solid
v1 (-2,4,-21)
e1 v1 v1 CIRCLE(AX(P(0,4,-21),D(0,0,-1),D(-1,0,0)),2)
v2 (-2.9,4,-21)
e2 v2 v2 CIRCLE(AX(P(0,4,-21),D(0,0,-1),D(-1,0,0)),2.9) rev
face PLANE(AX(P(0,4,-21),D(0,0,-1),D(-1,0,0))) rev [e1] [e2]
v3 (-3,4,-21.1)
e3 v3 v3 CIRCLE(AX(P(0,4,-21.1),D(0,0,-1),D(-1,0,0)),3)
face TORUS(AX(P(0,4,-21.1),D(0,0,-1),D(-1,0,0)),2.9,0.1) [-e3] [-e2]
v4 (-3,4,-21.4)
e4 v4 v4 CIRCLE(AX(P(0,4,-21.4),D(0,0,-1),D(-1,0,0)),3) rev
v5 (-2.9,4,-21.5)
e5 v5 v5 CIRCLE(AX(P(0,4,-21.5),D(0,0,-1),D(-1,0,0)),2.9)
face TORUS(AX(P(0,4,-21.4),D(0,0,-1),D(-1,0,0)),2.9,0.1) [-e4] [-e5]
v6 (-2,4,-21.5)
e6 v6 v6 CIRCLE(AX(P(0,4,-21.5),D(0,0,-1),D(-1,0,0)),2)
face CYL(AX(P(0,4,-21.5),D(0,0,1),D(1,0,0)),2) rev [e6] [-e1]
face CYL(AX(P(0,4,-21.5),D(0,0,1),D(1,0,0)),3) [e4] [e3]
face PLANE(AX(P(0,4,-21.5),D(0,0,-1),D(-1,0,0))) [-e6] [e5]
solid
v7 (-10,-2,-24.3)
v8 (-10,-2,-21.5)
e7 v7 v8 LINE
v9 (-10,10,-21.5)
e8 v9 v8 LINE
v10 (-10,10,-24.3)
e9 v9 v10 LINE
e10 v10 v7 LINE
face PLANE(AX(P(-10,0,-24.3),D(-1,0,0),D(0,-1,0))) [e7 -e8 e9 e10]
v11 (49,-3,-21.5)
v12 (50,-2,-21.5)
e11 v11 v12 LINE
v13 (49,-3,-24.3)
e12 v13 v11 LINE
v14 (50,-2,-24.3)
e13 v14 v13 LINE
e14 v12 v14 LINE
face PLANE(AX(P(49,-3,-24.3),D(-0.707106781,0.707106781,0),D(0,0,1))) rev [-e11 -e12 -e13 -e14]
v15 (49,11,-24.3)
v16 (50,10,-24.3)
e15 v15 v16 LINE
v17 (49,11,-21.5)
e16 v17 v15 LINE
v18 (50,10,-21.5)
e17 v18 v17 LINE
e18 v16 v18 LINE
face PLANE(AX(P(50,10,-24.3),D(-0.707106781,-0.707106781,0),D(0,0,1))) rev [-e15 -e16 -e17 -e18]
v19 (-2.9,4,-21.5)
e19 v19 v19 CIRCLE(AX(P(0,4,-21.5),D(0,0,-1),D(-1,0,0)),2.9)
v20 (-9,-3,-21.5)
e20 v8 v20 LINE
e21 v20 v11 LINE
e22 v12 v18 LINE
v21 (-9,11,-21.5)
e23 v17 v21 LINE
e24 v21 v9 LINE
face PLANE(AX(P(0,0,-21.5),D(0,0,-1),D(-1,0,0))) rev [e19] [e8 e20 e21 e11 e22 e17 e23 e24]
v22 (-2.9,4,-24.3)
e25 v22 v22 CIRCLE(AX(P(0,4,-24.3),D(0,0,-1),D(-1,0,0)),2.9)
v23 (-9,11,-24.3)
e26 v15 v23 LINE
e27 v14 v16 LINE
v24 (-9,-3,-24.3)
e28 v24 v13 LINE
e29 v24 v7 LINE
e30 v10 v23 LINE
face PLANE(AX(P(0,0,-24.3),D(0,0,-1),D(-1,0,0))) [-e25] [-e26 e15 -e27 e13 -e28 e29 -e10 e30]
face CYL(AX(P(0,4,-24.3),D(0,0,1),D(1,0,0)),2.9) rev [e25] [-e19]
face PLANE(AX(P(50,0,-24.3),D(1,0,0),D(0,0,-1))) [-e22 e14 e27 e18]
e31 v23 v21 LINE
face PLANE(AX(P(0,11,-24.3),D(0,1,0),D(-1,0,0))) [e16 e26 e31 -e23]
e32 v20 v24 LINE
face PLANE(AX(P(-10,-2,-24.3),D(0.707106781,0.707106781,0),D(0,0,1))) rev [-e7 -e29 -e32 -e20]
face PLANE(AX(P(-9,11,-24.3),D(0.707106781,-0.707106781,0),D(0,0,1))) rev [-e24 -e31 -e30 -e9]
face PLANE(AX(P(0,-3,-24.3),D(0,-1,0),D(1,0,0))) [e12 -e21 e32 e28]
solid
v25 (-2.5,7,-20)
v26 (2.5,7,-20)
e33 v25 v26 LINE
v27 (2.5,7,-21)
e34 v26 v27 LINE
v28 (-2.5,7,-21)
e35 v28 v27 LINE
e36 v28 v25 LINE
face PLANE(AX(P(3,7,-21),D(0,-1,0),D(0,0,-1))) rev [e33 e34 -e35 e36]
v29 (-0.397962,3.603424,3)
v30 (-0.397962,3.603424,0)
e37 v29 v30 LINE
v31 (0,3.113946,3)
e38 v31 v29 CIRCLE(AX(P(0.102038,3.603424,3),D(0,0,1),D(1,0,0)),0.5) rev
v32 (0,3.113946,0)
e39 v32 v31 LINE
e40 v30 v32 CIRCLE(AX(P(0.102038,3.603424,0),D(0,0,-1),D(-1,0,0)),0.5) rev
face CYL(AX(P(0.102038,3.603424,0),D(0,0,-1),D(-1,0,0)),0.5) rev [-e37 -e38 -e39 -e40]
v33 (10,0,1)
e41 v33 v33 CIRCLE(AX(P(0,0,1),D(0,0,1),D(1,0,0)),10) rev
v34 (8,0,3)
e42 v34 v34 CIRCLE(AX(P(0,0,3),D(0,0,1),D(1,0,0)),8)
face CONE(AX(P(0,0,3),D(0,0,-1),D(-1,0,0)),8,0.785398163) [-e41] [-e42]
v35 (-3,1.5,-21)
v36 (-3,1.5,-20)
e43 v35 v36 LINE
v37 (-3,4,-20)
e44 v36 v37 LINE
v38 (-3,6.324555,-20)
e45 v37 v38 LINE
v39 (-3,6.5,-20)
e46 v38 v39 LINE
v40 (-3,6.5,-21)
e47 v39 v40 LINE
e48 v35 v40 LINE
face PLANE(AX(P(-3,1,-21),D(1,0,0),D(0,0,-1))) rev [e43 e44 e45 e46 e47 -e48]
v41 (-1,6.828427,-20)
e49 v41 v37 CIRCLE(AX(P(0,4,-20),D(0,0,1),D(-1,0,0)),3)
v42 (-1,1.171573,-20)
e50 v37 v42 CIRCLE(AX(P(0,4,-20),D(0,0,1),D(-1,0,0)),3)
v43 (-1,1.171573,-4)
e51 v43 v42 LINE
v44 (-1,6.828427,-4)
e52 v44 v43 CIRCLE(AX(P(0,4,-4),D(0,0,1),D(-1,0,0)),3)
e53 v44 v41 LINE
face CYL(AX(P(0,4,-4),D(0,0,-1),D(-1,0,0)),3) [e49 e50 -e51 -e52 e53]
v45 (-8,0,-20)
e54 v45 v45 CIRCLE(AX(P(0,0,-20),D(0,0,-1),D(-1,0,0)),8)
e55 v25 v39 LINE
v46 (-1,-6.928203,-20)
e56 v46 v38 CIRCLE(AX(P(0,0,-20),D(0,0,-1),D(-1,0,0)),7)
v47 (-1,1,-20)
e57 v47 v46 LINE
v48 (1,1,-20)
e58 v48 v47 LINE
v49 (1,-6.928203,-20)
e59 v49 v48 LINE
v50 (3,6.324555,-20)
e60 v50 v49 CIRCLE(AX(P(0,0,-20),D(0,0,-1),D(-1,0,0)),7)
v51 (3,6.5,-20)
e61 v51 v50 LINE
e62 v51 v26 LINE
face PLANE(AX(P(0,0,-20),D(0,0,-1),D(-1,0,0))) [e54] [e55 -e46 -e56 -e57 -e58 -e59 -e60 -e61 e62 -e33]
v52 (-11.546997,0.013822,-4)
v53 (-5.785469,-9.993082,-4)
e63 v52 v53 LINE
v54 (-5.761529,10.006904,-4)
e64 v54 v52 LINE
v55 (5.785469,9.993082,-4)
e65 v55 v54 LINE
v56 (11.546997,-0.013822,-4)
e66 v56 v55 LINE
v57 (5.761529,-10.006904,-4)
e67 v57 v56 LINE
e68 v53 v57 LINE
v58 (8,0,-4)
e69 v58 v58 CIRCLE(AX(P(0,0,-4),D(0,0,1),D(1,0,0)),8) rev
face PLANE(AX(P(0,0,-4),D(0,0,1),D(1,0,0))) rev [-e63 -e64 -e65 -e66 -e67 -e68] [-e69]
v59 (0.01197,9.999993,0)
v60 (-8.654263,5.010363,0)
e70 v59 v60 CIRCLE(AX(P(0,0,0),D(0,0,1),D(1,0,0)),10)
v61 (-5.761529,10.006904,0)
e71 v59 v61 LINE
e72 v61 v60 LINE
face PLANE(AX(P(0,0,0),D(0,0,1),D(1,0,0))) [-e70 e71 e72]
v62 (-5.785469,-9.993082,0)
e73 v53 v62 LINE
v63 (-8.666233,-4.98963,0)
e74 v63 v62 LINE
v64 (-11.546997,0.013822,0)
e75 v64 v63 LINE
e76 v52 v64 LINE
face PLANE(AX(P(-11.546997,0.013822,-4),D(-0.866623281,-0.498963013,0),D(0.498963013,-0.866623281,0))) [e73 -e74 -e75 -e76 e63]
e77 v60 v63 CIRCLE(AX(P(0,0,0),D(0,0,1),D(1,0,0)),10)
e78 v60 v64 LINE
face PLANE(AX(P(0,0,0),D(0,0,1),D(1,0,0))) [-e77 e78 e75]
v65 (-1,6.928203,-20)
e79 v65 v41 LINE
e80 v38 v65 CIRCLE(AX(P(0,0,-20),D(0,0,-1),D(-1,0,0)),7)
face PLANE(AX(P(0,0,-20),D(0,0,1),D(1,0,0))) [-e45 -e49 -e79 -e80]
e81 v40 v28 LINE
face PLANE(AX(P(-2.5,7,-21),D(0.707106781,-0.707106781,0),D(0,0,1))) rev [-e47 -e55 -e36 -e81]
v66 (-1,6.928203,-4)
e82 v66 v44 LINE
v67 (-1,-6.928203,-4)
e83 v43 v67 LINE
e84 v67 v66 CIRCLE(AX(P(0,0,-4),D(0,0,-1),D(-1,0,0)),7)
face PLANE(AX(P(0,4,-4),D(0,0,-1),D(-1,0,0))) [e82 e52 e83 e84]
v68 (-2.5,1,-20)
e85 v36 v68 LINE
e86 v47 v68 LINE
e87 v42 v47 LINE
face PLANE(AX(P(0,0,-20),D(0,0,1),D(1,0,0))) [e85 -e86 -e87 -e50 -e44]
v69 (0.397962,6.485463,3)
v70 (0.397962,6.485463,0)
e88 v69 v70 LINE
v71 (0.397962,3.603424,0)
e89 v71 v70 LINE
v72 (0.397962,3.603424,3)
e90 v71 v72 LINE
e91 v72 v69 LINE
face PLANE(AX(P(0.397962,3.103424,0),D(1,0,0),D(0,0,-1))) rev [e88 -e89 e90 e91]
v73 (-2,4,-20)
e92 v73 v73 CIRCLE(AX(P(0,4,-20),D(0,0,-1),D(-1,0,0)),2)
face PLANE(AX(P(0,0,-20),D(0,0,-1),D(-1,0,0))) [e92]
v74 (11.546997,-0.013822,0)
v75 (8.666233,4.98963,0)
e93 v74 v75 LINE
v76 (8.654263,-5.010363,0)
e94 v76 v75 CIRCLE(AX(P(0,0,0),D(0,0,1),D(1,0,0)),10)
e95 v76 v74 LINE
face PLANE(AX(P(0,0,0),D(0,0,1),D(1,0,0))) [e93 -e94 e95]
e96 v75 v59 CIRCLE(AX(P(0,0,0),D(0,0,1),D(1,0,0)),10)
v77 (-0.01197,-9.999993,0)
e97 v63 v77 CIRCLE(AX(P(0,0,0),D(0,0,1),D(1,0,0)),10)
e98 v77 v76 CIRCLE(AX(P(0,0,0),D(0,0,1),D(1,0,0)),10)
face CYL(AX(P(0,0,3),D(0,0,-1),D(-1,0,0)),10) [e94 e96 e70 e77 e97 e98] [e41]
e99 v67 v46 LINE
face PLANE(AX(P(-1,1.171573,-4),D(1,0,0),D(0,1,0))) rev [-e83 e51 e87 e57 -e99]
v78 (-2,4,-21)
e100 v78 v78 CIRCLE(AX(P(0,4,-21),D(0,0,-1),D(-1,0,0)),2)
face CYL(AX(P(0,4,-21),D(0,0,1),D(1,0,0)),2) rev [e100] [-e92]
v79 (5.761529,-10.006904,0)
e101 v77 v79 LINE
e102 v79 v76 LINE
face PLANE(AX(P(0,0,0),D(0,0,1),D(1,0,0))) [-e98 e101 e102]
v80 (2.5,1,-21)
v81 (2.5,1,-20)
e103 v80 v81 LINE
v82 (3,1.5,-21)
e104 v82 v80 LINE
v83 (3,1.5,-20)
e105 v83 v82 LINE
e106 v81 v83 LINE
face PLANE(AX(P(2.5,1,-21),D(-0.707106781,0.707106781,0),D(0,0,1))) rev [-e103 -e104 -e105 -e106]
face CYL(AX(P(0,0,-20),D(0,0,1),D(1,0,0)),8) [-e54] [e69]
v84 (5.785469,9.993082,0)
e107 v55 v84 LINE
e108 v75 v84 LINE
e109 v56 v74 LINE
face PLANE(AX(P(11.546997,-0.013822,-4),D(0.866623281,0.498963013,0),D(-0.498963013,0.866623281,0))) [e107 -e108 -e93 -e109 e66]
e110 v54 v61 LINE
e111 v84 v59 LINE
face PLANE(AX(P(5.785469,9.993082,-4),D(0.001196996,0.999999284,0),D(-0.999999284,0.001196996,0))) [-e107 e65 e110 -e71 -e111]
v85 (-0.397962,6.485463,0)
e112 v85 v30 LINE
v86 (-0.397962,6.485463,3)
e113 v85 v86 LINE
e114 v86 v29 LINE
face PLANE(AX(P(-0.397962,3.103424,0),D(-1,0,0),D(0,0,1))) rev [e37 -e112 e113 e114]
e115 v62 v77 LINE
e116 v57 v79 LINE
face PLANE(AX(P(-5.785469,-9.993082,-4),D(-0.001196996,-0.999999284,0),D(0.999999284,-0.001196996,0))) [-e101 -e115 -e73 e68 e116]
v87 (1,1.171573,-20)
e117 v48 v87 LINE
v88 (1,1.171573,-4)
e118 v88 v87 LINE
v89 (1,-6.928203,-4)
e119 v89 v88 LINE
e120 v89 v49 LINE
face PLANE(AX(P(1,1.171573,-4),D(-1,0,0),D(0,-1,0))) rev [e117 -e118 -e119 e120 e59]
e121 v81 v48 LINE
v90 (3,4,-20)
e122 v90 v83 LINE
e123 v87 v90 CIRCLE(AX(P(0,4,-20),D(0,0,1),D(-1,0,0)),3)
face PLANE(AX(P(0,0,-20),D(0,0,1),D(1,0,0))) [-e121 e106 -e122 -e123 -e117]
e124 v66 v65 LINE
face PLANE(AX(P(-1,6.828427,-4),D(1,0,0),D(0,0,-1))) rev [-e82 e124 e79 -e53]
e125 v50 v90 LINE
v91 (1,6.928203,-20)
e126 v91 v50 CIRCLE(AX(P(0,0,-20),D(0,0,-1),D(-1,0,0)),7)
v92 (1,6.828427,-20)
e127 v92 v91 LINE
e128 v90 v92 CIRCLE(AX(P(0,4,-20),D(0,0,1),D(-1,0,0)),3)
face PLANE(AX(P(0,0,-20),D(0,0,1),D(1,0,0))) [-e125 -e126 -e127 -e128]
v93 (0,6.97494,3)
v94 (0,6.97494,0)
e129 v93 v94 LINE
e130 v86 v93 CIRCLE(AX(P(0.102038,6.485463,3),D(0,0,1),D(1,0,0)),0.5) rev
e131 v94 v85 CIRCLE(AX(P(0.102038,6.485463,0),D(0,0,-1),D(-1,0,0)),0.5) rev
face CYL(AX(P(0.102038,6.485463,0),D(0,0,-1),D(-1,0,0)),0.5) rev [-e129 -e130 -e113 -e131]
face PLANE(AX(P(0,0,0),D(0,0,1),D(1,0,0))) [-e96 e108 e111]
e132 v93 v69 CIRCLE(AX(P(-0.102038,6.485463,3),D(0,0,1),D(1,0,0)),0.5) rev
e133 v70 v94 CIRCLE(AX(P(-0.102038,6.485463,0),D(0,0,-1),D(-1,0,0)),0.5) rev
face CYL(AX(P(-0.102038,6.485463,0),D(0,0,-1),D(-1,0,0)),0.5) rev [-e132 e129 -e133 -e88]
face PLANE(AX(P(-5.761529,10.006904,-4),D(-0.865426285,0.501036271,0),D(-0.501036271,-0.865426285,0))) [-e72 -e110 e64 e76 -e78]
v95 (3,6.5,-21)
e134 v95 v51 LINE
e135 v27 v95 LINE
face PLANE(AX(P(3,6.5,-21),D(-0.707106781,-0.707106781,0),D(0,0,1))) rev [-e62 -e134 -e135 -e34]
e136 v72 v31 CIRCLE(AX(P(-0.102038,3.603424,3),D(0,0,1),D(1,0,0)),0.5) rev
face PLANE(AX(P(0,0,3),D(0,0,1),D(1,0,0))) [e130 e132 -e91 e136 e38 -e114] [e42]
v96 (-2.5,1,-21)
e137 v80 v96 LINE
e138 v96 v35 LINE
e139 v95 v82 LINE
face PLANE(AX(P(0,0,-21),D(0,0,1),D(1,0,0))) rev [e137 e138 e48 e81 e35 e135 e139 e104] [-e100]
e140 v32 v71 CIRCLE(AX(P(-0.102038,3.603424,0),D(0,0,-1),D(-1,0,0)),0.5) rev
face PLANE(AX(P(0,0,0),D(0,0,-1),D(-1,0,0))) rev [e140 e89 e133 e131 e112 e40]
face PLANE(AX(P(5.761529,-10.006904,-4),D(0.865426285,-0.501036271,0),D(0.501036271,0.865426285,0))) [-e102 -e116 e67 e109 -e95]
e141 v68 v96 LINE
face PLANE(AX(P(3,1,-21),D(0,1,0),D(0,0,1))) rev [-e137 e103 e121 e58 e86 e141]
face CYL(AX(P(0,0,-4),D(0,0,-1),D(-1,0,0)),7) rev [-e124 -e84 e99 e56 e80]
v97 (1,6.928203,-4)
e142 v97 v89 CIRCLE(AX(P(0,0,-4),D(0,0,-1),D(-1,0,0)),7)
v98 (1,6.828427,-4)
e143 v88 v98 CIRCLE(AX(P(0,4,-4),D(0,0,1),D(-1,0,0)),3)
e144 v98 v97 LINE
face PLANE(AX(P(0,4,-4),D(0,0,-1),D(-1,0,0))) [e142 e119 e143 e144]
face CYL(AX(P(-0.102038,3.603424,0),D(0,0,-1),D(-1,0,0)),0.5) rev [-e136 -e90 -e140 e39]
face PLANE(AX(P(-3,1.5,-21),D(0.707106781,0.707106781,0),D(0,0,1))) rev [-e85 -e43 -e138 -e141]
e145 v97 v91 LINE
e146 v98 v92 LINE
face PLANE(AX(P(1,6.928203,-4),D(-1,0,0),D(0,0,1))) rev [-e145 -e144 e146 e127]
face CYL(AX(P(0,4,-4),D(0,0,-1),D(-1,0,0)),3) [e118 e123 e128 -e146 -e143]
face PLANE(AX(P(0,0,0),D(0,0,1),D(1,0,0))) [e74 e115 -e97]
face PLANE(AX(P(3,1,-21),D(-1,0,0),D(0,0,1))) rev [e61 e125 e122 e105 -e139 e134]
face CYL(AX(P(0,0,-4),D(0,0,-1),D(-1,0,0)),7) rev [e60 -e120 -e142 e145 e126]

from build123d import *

# Parameters (mm, degrees)
BOSS_EXTRUDE1_DEPTH     = 4
SKETCH2_R               = 8
BOSS_EXTRUDE2_DEPTH     = 16
CUT_EXTRUDE1_DEPTH      = 16
SKETCH5_R               = 10
BOSS_EXTRUDE4_DEPTH     = 3
CHAMFER2_SIZE           = 2
SKETCH6_W               = 0.795923982
SKETCH6_H               = 3.882038779
CUT_EXTRUDE2_DEPTH      = 3
FILLET2_R               = 0.5
SKETCH9_W               = 6
SKETCH9_H               = 6
SKETCH9_R               = 2
BOSS_EXTRUDE6_DEPTH     = 1
CHAMFER3_SIZE           = 0.5
SKETCH10_R              = 3
SKETCH10_R_2            = 2
BOSS_EXTRUDE7_DEPTH     = 0.5
FILLET3_R               = 0.1
BOSS_EXTRUDE8_OUTLINE_W = 60
BOSS_EXTRUDE8_OUTLINE_H = 14
BOSS_EXTRUDE8_OUTLINE_R = 2.9
BOSS_EXTRUDE8_DEPTH     = 2.8
CHAMFER4_SIZE           = 1


# Read off the part's stored shape, not the designer's step: Boss-Extrude8
with BuildPart() as part:
    # Sketch1 → Boss-Extrude1 (new body)
    with BuildSketch(Plane.XY):
        Polygon((5.785468513, 9.993081978), (-5.761528598, 10.006903694), (-11.546997112, 0.013821717), (-5.785468513, -9.993081978), (5.761528598, -10.006903694), (11.546997112, -0.013821717), align=None)
    extrude(amount=-BOSS_EXTRUDE1_DEPTH)

    # Sketch2 → Boss-Extrude2 (add)
    with BuildSketch(Plane(origin=(0, 0, -4), x_dir=(-1, 0, 0), z_dir=(0, 0, -1))):
        with Locations(Location((0, 0, 0), (0, 0, 180))):
            Circle(SKETCH2_R)
    extrude(amount=BOSS_EXTRUDE2_DEPTH)

    # Sketch3 → Cut-Extrude1 (cut)
    with BuildSketch(Plane(origin=(0, 0, -20), x_dir=(-1, 0, 0), z_dir=(0, 0, -1))):
        with BuildLine():
            Line((-1, 1.171572875), (-1, -6.92820323))
            ThreePointArc((-1, -6.92820323), (-7, 0), (-1, 6.92820323))
            Line((-1, 6.92820323), (-1, 6.828427125))
            ThreePointArc((-1, 6.828427125), (-3, 4), (-1, 1.171572875))
        make_face()
        with BuildLine():
            Line((1, 1.171572875), (1, -6.92820323))
            ThreePointArc((1, -6.92820323), (7, 0), (1, 6.92820323))
            Line((1, 6.92820323), (1, 6.828427125))
            ThreePointArc((1, 6.828427125), (3, 4), (1, 1.171572875))
        make_face()
    extrude(amount=-CUT_EXTRUDE1_DEPTH, mode=Mode.SUBTRACT)

    # Sketch5 → Boss-Extrude4 (add)
    with BuildSketch(Plane.XY):
        with Locations(Location((0, 0, 0), (0, 0, 209.931417178))):
            Circle(SKETCH5_R)
    extrude(amount=BOSS_EXTRUDE4_DEPTH)

    # Chamfer2
    chamfer2_edges = [part.edges().sort_by_distance(p)[0] for p in [
        (8.666232812, 4.989630131, 3),
    ]]
    chamfer(chamfer2_edges, length=CHAMFER2_SIZE)

    # Sketch6 → Cut-Extrude2 (cut)
    with BuildSketch(Plane.XY.offset(3)):
        with Locations((0, 5.044443369)):
            Rectangle(SKETCH6_W, SKETCH6_H)
    extrude(amount=-CUT_EXTRUDE2_DEPTH, mode=Mode.SUBTRACT)

    # Fillet2
    # the kernel refuses this fillet: 0.5 mm, written as the material it adds along each edge
    with BuildSketch(Plane(origin=(0.397961991, 3.103423979, 3), x_dir=(-1, 0, 0), z_dir=(0, 0, -1)), Plane(origin=(0.397961991, 6.985462758, 3), x_dir=(0, -1, 0), z_dir=(0, 0, -1)), Plane(origin=(-0.397961991, 6.985462758, 3), x_dir=(1, 0, 0), z_dir=(0, 0, -1))) as fillet2_piece_1:
        with BuildLine():
            CenterArc((FILLET2_R, FILLET2_R), FILLET2_R, 180, 90)
            Line((0, FILLET2_R), (0, 0))
            Line((0, 0), (FILLET2_R, 0))
        make_face()
    extrude(amount=4.25)
    with BuildSketch(Plane(origin=(-0.397961991, 3.103423979, 3), x_dir=(1, 0, 0), z_dir=(0, 0, -1))) as fillet2_piece_2:
        with BuildLine():
            CenterArc((FILLET2_R, -FILLET2_R), FILLET2_R, 90, 90)
            Line((0, -FILLET2_R), (0, 0))
            Line((0, 0), (FILLET2_R, 0))
        make_face()
    extrude(amount=4.25)

    # Sketch9 → Boss-Extrude6 (add)
    with BuildSketch(Plane(origin=(0, 0, -20), x_dir=(-1, 0, 0), z_dir=(0, 0, -1))):
        with Locations((0, 4)):
            Rectangle(SKETCH9_W, SKETCH9_H)
        with Locations((0, 4)):
            Circle(SKETCH9_R, mode=Mode.SUBTRACT)
    extrude(amount=BOSS_EXTRUDE6_DEPTH)

    # Chamfer3
    chamfer3_edges = [part.edges().sort_by_distance(p)[0] for p in [
        (-3, 1, -20.5),
        (-3, 7, -20.5),
        (3, 7, -20.5),
        (3, 1, -20.5),
    ]]
    chamfer(chamfer3_edges, length=CHAMFER3_SIZE)


with BuildPart() as body_2:
    # Sketch10 → Boss-Extrude7 (new body)
    with BuildSketch(Plane(origin=(0, 0, -21), x_dir=(-1, 0, 0), z_dir=(0, 0, -1))):
        with Locations((0, 4)):
            Circle(SKETCH10_R)
        with Locations((0, 4)):
            Circle(SKETCH10_R_2, mode=Mode.SUBTRACT)
    extrude(amount=BOSS_EXTRUDE7_DEPTH)

    # Fillet3
    fillet3_edges = [body_2.edges().sort_by_distance(p)[0] for p in [
        (3, 4, -21),
        (3, 4, -21.5),
    ]]
    fillet(fillet3_edges, radius=FILLET3_R)


with BuildPart() as body_3:
    # Boss-Extrude8 outline → Boss-Extrude8 (new body)
    with BuildSketch(Plane(origin=(0, 0, -21.5), x_dir=(-1, 0, 0), z_dir=(0, 0, -1))):
        with Locations((-20, 4)):
            Rectangle(BOSS_EXTRUDE8_OUTLINE_W, BOSS_EXTRUDE8_OUTLINE_H)
        with Locations((0, 4)):
            Circle(BOSS_EXTRUDE8_OUTLINE_R, mode=Mode.SUBTRACT)
    extrude(amount=BOSS_EXTRUDE8_DEPTH)

    # Chamfer4
    chamfer4_edges = [body_3.edges().sort_by_distance(p)[0] for p in [
        (-10, -3, -22.9),
        (50, -3, -22.9),
        (50, 11, -22.9),
        (-10, 11, -22.9),
    ]]
    chamfer(chamfer4_edges, length=CHAMFER4_SIZE)


solid = Compound([part.part, body_2.part, body_3.part])
